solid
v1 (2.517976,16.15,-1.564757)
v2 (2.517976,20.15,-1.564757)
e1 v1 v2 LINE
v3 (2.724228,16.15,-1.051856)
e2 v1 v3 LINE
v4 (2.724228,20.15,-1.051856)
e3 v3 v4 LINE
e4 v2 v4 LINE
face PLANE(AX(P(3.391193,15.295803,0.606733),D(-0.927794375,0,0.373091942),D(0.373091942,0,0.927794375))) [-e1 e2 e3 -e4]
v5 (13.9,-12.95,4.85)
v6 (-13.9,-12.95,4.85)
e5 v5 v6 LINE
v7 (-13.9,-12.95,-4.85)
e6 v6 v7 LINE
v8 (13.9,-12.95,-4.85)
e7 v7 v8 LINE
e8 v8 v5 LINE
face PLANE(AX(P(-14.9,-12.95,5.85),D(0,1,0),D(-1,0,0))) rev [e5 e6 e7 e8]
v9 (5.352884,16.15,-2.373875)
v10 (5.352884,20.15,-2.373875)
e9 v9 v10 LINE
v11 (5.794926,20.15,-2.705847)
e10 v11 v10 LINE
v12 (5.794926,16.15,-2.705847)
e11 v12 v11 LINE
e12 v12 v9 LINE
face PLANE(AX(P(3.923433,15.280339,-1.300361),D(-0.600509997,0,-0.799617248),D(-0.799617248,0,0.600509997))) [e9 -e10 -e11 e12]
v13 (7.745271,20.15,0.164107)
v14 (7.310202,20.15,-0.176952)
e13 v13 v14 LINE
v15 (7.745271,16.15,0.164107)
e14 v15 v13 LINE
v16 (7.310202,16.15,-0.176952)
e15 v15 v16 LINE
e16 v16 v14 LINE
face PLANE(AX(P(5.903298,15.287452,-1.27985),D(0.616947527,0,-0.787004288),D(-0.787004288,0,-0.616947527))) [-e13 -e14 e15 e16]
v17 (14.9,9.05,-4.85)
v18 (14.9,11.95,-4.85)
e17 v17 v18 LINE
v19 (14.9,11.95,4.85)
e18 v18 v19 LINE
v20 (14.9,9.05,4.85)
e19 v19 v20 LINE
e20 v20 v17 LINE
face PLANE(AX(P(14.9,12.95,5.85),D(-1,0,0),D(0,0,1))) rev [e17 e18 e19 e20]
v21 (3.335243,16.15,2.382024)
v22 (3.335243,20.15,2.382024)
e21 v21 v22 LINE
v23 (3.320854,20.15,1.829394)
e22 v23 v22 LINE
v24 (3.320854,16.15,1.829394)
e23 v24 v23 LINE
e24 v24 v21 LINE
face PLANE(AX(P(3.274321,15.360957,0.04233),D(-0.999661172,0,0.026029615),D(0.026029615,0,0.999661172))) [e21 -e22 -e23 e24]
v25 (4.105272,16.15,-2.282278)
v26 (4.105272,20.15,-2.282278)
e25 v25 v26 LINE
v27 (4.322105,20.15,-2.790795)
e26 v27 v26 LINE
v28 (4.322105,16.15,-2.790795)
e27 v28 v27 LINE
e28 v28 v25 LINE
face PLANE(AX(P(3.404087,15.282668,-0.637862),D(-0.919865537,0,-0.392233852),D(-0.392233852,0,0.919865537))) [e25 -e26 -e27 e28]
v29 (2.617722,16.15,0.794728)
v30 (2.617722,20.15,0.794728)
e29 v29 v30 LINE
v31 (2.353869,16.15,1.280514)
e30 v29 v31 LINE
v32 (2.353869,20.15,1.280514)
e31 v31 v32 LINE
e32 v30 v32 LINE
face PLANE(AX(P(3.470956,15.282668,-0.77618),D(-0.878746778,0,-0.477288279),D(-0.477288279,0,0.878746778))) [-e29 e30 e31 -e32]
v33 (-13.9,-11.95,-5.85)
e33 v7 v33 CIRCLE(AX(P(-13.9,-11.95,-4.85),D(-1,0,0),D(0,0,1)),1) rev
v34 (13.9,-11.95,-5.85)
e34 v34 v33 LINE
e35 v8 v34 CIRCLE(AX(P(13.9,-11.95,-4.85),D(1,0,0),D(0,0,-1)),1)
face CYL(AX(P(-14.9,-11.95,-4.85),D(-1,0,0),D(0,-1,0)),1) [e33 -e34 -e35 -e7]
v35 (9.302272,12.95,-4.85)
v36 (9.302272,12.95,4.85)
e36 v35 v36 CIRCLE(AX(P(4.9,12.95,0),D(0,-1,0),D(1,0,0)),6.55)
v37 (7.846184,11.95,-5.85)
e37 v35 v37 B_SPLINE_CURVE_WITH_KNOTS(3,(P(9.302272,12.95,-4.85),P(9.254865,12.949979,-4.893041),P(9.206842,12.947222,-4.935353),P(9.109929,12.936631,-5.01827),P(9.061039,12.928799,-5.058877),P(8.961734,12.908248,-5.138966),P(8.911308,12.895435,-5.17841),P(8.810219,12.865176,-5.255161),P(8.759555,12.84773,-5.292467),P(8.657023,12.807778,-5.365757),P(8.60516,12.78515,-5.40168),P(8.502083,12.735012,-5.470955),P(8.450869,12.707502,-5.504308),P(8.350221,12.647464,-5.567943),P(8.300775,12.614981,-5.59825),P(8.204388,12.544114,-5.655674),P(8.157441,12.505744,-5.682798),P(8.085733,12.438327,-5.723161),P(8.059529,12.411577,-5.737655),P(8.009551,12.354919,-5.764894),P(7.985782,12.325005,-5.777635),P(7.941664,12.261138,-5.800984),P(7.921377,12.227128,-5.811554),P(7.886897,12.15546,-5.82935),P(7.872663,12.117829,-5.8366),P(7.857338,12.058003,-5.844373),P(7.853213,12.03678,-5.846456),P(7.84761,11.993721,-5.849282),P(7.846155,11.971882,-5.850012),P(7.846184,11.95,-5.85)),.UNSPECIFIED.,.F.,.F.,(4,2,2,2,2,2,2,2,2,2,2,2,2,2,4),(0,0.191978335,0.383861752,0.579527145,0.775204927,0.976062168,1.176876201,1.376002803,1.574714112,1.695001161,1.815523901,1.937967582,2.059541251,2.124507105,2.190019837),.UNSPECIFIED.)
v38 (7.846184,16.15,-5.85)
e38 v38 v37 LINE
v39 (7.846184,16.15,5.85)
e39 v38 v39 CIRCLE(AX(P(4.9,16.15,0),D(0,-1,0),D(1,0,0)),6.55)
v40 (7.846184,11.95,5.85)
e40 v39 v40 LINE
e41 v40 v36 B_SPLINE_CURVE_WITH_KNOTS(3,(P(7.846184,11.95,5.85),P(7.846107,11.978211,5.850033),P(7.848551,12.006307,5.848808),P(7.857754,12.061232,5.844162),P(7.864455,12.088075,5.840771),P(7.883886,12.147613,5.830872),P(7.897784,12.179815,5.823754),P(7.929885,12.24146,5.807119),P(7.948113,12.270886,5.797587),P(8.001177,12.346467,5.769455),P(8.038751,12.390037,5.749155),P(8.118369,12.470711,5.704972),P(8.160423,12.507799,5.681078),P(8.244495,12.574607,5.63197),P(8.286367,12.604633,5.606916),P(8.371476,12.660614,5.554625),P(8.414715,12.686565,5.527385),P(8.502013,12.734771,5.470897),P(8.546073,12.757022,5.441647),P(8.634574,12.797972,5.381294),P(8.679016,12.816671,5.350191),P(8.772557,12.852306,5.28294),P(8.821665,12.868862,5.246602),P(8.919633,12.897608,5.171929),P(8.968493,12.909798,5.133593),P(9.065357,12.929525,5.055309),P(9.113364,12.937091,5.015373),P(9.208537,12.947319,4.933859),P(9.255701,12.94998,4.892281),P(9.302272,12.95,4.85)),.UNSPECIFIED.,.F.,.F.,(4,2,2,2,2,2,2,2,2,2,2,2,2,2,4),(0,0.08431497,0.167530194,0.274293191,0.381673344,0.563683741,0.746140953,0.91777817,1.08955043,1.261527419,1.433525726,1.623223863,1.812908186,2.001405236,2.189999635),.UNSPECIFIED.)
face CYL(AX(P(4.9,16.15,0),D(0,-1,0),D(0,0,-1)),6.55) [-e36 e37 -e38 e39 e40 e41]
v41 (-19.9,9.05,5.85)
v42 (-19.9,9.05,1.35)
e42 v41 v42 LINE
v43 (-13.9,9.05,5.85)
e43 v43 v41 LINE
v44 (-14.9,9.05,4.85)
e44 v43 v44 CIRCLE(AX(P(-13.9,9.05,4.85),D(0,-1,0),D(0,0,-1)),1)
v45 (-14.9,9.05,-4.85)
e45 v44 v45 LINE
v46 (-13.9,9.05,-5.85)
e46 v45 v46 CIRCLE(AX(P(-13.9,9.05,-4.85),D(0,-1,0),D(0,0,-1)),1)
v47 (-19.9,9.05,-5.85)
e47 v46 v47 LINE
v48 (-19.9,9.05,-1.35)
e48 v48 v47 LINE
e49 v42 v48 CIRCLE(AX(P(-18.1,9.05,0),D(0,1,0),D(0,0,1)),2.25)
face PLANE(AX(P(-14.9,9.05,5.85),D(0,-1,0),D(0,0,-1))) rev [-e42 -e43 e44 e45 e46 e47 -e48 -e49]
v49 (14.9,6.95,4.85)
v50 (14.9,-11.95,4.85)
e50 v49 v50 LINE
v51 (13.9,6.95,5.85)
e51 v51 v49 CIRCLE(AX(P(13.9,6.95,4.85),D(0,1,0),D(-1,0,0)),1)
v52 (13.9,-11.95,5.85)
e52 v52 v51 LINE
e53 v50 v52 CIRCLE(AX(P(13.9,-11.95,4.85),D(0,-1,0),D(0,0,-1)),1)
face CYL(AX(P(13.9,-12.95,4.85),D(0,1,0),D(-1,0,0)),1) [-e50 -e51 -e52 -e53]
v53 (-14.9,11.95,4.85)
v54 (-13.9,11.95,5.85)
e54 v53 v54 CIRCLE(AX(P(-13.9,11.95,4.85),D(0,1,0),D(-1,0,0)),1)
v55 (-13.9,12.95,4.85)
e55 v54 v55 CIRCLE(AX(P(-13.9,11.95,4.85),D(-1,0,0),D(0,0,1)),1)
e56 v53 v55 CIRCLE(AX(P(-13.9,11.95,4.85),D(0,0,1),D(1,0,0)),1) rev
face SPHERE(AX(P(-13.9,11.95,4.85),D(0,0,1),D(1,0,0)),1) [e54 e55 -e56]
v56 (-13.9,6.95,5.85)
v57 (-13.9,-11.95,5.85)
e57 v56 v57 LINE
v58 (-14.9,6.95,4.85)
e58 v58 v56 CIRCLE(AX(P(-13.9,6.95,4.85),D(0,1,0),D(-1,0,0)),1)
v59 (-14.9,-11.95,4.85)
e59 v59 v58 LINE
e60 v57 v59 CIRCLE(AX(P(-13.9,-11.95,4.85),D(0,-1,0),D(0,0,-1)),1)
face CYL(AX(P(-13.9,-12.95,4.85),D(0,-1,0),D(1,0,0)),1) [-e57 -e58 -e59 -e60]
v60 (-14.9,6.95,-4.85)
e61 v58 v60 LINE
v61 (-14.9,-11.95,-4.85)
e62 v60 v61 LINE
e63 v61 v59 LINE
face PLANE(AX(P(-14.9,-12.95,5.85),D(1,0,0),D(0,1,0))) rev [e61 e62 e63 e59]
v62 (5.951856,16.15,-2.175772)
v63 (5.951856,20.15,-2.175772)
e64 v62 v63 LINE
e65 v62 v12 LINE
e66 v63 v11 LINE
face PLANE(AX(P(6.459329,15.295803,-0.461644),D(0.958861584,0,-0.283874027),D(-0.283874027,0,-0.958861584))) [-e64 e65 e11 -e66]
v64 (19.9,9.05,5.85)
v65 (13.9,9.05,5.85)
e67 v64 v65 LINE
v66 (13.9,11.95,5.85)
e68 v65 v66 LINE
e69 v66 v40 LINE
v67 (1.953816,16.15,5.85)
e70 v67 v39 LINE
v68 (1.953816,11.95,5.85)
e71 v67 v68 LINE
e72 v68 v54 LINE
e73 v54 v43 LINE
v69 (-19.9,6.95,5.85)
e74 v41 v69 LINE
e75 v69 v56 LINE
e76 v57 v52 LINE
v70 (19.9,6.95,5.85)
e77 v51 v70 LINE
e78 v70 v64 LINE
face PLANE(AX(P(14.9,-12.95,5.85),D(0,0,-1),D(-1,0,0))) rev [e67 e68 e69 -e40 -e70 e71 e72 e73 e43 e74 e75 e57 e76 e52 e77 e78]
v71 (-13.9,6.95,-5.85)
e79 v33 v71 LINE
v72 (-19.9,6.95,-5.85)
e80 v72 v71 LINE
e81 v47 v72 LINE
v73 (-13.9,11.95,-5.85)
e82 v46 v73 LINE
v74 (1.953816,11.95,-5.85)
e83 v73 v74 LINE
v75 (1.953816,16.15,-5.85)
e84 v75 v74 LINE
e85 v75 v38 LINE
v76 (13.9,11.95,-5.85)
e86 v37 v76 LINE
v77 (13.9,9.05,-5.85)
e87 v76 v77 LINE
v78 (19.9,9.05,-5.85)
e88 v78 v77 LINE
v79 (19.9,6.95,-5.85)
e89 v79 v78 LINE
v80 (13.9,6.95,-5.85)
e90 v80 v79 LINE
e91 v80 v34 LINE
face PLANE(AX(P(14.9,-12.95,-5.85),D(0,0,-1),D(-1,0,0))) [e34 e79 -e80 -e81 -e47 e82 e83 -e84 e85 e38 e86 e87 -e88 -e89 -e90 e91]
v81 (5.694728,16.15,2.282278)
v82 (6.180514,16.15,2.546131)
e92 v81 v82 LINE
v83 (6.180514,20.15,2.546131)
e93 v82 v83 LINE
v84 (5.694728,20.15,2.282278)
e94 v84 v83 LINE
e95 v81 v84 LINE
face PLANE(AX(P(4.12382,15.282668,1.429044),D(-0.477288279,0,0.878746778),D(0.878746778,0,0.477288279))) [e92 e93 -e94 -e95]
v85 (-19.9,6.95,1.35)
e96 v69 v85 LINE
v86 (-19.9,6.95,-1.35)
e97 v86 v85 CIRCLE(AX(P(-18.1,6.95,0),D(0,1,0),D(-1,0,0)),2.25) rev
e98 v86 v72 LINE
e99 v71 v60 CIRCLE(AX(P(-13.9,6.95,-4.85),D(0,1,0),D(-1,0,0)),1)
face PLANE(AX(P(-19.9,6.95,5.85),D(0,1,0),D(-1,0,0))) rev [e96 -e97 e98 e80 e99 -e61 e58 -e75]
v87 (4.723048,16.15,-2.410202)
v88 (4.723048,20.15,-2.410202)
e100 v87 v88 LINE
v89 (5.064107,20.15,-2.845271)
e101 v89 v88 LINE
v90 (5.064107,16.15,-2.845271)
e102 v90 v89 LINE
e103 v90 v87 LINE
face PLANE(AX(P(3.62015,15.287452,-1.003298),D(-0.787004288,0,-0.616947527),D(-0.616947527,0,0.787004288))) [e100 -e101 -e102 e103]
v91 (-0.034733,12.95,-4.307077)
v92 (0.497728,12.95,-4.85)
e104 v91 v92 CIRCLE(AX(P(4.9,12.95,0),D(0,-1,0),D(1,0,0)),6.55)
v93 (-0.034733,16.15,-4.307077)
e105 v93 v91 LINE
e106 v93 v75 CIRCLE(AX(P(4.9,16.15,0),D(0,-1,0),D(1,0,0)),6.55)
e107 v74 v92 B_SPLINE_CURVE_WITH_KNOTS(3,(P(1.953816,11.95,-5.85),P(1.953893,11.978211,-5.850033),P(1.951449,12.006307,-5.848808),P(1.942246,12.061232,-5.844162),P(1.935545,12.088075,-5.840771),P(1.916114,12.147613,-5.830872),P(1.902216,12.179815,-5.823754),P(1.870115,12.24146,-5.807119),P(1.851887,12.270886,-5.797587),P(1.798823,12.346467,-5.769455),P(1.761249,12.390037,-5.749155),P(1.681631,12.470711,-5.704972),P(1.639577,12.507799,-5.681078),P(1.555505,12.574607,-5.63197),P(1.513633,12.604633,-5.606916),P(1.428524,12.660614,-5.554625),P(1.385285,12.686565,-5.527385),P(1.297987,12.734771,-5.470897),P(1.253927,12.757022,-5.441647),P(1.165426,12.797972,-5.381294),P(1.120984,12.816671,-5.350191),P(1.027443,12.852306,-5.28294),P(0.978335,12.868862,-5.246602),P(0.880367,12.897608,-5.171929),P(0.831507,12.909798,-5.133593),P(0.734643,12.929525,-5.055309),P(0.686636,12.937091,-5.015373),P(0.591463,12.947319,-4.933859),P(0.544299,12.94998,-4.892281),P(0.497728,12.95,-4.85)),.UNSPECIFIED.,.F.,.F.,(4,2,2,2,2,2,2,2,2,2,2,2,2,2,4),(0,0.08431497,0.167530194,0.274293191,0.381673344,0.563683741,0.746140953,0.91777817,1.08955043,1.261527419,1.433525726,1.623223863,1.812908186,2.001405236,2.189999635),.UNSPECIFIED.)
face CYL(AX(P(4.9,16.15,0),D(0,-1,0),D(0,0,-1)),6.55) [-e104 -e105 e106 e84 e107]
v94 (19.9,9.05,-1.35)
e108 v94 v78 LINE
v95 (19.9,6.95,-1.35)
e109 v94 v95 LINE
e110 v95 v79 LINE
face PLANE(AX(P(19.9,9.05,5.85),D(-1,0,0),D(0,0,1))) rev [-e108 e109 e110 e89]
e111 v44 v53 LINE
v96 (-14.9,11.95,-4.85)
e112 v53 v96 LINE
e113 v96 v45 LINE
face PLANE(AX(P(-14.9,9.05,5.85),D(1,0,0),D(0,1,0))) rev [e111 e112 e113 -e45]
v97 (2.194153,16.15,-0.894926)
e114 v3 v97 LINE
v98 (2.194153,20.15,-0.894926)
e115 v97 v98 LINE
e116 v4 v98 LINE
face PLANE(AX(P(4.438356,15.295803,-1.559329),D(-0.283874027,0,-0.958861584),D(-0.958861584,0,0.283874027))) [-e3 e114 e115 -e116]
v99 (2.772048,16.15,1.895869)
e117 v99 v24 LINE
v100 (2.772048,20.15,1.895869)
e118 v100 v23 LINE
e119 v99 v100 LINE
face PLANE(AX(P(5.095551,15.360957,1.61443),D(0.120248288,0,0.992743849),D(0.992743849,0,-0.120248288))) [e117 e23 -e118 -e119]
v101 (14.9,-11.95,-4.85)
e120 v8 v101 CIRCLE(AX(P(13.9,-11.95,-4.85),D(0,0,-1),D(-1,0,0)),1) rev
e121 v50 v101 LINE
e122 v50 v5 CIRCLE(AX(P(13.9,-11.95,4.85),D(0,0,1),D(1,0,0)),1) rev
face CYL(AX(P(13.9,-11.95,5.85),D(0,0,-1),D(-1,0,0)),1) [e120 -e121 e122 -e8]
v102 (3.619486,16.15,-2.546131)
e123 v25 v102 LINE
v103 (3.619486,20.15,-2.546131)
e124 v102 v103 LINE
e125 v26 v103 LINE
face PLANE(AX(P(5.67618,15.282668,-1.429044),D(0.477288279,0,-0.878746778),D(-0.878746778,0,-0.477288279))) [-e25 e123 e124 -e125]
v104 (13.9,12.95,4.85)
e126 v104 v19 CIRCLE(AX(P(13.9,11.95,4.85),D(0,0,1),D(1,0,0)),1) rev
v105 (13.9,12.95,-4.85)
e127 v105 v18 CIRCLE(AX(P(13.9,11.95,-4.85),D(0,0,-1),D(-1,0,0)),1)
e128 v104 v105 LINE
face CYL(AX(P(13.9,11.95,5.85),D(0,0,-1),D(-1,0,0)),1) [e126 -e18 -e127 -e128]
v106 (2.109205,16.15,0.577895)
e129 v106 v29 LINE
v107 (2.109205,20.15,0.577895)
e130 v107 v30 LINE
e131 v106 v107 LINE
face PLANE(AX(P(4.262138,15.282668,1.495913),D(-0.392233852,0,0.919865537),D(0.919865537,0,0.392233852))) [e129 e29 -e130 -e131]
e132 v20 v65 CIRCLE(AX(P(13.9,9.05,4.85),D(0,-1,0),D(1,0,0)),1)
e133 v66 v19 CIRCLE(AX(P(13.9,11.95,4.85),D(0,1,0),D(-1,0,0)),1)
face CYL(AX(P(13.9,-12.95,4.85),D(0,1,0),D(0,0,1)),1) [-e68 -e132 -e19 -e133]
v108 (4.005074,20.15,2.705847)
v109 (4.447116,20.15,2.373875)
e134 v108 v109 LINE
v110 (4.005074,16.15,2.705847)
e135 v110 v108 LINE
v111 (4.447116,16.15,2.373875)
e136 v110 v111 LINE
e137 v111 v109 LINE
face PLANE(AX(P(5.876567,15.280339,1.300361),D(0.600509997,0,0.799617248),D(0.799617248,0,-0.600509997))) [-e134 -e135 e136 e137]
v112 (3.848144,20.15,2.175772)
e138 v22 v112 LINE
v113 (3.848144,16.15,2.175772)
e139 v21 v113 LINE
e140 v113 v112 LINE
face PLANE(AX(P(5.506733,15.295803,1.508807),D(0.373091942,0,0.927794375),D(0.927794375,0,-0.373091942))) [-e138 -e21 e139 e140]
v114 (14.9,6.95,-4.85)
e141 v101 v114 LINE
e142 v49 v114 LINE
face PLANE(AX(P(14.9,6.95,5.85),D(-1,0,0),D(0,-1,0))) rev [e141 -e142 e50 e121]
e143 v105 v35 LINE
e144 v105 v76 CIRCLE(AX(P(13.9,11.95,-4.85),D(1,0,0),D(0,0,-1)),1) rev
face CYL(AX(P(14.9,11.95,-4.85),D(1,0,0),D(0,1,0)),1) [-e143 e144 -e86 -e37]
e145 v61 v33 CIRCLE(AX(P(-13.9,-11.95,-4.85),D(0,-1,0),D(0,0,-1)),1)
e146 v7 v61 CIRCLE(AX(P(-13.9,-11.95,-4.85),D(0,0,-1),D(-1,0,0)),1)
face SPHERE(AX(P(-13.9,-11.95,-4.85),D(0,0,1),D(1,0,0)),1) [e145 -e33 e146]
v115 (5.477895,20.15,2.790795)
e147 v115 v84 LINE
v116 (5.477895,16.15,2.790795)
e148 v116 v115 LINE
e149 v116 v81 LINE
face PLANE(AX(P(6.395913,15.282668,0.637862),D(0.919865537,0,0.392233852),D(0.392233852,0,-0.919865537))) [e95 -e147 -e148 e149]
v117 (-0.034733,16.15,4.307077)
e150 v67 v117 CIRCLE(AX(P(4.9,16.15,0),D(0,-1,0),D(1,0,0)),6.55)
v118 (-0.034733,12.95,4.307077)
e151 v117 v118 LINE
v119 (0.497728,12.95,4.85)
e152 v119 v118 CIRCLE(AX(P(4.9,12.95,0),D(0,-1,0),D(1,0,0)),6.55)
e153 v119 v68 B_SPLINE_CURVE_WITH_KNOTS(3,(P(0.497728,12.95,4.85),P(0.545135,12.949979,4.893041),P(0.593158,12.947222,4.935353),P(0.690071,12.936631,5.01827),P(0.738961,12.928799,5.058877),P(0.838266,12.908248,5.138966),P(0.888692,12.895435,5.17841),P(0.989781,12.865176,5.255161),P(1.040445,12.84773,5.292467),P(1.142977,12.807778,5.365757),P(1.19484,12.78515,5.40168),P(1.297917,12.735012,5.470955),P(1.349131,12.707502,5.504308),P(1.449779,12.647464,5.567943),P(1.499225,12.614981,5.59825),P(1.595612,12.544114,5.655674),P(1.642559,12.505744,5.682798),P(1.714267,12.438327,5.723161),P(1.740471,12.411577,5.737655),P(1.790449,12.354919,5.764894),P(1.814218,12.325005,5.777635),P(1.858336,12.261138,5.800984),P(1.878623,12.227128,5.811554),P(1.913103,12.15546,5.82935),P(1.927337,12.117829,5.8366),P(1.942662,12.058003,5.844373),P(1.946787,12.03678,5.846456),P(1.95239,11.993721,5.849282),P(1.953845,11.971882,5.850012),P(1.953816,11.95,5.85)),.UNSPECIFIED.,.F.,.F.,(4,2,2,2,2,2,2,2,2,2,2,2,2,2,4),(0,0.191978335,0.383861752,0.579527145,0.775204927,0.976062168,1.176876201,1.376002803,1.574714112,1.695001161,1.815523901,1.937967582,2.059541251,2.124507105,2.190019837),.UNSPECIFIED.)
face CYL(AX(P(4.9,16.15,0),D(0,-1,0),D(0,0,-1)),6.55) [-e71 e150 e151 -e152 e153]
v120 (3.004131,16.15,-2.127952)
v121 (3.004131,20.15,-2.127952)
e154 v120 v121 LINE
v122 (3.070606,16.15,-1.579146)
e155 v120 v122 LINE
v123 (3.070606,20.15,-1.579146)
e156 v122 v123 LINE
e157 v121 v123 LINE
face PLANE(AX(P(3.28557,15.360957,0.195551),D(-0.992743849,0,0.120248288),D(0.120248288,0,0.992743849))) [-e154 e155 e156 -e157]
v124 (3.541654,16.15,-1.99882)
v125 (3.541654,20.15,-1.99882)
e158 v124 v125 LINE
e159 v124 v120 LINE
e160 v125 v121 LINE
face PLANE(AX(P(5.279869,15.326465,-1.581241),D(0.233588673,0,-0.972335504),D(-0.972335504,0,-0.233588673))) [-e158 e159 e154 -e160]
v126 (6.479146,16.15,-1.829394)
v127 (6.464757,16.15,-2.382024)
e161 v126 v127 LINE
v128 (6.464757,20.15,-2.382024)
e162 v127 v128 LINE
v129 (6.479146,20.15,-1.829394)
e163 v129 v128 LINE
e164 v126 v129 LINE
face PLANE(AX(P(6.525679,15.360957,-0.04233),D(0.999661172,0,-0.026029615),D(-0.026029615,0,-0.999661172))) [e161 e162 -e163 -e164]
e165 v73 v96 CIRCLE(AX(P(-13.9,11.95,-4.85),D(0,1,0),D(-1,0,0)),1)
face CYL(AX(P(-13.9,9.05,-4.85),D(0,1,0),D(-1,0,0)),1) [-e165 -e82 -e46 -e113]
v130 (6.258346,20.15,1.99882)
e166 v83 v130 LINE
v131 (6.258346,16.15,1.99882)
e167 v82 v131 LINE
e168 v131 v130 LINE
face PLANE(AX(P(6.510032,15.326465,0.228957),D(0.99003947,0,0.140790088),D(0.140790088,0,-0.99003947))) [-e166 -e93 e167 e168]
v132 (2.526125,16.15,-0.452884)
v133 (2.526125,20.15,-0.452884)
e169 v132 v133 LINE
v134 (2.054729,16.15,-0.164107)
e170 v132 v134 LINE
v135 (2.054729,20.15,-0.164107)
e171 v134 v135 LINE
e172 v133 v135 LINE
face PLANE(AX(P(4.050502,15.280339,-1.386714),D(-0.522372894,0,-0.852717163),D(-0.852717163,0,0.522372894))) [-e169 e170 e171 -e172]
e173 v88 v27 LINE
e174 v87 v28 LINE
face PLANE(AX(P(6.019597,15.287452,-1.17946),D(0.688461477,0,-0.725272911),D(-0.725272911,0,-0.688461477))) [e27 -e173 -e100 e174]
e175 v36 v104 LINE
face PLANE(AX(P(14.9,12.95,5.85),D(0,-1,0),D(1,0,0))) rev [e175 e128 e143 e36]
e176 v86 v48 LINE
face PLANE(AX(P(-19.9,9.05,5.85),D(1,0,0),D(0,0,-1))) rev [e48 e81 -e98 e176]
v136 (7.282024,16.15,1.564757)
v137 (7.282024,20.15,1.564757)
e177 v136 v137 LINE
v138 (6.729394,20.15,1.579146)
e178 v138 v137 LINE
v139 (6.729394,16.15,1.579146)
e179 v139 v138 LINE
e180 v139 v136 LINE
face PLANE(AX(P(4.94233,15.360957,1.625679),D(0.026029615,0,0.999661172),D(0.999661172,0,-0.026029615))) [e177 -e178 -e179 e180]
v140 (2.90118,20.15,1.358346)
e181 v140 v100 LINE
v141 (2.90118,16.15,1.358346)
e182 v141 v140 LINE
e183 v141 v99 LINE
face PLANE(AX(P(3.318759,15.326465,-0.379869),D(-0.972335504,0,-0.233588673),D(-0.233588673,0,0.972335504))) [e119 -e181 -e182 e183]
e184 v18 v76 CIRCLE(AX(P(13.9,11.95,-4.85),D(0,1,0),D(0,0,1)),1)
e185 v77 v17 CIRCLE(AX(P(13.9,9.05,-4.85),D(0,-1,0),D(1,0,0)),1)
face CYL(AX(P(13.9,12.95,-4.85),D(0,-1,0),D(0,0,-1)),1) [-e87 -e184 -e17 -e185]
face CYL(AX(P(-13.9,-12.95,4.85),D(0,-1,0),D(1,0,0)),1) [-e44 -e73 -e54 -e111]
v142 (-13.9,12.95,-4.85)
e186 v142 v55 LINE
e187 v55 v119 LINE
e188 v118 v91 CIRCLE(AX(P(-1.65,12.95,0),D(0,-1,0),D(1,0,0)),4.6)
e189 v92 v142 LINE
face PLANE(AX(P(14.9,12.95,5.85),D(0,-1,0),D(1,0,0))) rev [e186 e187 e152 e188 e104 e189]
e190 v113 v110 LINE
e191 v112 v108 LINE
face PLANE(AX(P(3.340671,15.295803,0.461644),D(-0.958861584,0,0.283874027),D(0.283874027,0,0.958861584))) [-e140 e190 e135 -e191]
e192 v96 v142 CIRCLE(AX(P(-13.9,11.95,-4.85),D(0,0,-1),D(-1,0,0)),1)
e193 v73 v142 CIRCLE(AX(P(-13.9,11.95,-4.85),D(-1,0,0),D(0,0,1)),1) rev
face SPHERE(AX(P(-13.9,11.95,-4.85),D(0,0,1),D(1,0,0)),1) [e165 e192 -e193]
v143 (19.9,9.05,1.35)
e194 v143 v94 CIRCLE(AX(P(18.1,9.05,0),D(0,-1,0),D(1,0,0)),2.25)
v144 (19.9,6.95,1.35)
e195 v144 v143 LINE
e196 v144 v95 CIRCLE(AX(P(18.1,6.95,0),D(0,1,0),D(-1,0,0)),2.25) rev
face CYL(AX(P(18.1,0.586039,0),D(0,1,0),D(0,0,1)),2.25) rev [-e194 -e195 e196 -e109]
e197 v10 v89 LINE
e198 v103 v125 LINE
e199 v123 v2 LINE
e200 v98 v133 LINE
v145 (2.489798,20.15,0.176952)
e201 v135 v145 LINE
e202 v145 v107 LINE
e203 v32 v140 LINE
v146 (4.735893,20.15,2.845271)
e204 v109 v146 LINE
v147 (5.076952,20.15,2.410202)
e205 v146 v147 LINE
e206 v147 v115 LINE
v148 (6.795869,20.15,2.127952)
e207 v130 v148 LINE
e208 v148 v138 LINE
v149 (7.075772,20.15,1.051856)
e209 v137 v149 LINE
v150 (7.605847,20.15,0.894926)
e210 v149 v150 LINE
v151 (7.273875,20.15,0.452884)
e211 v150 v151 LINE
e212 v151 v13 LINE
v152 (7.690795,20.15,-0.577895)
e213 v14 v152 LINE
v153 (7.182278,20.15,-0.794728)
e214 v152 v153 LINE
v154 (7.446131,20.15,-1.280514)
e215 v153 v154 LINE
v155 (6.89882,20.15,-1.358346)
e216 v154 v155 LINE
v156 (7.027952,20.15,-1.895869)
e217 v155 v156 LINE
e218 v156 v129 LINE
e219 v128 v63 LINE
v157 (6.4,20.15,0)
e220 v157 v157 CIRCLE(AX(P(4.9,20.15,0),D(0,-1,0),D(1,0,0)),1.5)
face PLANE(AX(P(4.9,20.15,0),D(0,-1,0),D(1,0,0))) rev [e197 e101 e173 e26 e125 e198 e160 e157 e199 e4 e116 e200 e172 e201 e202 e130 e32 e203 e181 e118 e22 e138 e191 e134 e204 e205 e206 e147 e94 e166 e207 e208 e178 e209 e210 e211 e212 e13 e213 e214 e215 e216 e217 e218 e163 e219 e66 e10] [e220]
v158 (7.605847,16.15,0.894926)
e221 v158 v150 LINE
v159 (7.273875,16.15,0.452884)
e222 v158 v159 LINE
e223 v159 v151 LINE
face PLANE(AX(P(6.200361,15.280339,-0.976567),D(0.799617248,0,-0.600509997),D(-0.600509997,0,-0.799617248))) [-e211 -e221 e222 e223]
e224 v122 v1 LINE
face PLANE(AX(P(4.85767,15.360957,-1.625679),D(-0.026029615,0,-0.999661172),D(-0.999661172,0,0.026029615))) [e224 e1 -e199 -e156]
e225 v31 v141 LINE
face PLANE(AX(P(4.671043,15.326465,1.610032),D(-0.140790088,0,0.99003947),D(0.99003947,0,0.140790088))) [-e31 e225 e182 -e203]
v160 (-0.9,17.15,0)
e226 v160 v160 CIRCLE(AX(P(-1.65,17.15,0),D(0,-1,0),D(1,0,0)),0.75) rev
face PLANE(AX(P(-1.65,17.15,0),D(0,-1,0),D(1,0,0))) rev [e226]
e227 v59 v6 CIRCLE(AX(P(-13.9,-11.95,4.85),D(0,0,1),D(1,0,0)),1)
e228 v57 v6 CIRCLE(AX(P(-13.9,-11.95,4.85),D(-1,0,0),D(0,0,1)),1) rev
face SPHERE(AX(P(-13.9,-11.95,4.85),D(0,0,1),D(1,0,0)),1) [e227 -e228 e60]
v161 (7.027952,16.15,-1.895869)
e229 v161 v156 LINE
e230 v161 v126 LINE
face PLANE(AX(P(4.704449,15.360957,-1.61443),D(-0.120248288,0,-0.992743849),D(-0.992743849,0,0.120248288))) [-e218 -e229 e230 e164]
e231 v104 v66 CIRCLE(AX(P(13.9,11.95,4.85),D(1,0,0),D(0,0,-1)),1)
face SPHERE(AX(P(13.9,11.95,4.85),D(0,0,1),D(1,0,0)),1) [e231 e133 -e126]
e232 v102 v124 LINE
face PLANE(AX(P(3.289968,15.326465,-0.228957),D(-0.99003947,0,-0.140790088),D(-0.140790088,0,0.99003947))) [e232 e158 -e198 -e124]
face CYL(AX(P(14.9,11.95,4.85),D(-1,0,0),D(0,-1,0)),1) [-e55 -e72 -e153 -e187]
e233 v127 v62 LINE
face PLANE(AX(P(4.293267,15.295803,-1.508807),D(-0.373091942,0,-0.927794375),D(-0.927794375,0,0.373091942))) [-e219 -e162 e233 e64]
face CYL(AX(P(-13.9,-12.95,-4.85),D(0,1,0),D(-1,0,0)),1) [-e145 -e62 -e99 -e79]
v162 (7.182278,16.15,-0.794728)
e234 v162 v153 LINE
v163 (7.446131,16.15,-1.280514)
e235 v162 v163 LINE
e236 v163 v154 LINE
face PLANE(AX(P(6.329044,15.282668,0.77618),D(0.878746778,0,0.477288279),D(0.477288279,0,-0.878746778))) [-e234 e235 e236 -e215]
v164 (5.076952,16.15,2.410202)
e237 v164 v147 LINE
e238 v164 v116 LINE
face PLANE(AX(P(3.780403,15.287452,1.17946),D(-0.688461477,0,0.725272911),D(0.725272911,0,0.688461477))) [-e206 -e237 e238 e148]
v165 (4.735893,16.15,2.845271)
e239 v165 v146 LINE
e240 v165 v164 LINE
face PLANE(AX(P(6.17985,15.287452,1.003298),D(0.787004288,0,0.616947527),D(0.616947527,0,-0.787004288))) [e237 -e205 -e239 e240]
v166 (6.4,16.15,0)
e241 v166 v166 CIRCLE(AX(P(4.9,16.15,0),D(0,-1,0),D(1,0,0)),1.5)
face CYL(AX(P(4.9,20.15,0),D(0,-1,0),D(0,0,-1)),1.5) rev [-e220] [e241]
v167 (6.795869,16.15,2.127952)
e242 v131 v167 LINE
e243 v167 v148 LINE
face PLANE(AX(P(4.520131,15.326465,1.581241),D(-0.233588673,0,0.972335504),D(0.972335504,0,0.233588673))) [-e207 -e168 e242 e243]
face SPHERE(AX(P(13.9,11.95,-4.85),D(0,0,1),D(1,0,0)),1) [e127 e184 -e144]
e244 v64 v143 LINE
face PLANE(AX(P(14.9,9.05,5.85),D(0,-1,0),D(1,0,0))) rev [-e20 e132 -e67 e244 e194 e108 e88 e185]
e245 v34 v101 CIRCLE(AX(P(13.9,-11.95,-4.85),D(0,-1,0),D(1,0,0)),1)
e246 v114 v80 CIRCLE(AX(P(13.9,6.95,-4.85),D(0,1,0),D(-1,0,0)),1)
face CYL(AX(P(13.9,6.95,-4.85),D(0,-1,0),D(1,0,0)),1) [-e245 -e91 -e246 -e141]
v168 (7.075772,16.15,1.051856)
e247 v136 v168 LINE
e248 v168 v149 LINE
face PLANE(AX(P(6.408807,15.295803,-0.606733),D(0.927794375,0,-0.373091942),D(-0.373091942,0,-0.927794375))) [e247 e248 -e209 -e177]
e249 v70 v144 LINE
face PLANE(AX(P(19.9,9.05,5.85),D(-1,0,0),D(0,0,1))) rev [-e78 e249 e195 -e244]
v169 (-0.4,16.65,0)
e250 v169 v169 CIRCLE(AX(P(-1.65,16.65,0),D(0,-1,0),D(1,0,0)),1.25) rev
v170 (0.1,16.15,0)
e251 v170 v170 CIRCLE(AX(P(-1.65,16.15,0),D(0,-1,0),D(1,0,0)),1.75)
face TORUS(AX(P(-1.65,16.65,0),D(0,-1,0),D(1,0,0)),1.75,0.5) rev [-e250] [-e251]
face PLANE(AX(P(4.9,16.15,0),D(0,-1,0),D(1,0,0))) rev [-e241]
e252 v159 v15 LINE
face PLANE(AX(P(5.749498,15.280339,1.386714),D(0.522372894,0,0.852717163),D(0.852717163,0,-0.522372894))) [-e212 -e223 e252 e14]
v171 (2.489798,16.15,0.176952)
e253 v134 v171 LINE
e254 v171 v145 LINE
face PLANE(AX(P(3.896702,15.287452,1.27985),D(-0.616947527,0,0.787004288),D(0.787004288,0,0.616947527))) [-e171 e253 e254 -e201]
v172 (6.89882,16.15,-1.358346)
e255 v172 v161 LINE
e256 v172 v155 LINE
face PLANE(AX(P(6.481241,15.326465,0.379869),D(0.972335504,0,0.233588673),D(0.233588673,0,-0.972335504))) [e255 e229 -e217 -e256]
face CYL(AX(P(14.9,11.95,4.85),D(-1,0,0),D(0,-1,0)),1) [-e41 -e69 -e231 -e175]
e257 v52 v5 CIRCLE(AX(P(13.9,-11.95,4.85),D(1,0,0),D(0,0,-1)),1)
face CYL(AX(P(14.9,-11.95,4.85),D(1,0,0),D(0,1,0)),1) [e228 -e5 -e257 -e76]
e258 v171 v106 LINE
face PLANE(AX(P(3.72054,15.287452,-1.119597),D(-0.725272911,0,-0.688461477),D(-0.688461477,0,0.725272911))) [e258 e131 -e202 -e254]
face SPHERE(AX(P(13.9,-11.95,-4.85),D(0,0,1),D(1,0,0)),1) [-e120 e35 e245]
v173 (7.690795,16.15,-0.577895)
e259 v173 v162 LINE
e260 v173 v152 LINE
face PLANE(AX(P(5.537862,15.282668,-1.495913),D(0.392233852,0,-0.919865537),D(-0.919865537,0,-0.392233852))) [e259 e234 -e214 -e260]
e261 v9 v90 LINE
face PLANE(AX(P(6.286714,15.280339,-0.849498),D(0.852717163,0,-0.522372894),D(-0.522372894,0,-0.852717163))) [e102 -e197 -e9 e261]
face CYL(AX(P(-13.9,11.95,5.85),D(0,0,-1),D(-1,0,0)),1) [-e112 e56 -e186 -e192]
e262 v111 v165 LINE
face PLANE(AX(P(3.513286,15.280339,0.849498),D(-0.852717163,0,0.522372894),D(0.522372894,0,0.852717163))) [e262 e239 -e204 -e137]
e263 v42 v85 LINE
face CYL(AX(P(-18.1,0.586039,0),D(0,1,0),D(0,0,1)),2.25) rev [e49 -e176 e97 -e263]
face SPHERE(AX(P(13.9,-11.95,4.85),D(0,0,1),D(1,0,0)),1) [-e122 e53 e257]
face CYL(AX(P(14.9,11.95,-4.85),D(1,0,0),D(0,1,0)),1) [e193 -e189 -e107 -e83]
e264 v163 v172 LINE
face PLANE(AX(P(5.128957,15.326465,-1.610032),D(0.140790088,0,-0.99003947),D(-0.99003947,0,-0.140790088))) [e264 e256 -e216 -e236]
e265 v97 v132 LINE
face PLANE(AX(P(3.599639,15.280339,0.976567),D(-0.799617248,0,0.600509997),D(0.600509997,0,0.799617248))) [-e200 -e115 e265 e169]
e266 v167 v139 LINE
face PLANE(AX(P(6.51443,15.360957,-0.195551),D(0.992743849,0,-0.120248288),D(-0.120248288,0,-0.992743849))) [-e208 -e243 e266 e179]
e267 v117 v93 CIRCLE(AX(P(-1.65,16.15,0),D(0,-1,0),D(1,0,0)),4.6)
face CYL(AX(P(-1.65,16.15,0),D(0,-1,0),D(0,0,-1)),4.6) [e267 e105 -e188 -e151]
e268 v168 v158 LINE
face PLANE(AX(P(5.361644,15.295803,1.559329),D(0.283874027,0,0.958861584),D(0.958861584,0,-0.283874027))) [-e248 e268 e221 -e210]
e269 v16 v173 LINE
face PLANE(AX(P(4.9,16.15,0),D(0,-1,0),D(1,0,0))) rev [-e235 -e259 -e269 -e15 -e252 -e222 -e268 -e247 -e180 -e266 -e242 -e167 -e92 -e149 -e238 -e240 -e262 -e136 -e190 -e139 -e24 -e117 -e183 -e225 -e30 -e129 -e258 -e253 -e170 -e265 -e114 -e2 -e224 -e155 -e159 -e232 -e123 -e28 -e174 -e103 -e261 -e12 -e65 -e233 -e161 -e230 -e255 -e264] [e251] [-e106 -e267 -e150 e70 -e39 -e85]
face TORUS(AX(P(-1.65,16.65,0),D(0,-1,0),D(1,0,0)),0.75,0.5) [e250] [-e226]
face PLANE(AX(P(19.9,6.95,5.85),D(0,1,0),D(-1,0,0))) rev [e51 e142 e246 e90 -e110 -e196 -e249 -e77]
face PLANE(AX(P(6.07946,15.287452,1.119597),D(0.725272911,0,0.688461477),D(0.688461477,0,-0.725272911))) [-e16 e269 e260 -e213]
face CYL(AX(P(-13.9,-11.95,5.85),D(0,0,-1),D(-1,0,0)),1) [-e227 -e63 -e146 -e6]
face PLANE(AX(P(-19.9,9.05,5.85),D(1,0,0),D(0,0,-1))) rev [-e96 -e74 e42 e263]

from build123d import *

# Parameters (mm, degrees)
EXTRUDE1_DEPTH    = 5.85
EXTRUDE2_START    = 9.05
SKETCH2_R         = 2.25
EXTRUDE2_DEPTH    = 2.1
EXTRUDE3_START    = 12.95
EXTRUDE3_DEPTH    = 3.2
EXTRUDE6_START    = 16.15
SKETCH6_R         = 1.25
EXTRUDE6_DEPTH    = 1
EXTRUDE4_START    = 16.15
SKETCH4_R         = 2.85
SKETCH4_R_2       = 1.5
EXTRUDE4_DEPTH    = 4
EXTRUDE5_START    = 16.15
EXTRUDE5_DEPTH    = 4
CIRPATTERN1_COUNT = 24
FILLET1_R         = 1
FILLET2_R         = 0.5


with BuildPart() as part:
    # Sketch1 → Extrude1 (new, symmetric)
    with BuildSketch(Plane.XY):
        Polygon((-14.9, -12.95), (-14.9, 6.95), (-19.9, 6.95), (-19.9, 9.05), (-14.9, 9.05), (-14.9, 12.95), (14.9, 12.95), (14.9, 9.05), (19.9, 9.05), (19.9, 6.95), (14.9, 6.95), (14.9, -12.95), align=None)
    extrude(amount=EXTRUDE1_DEPTH, both=True)

    # Sketch2 → Extrude2 (cut)
    with BuildSketch(Plane(origin=(0, 0, 0), x_dir=(1, 0, 0), z_dir=(0, 1, 0)).offset(EXTRUDE2_START)):
        with Locations((-18.1, 0)):
            Circle(SKETCH2_R)
        with Locations((18.1, 0)):
            Circle(SKETCH2_R)
    extrude(amount=-EXTRUDE2_DEPTH, mode=Mode.SUBTRACT)

    # Sketch3 → Extrude3 (add)
    with BuildSketch(Plane(origin=(0, 0, 0), x_dir=(1, 0, 0), z_dir=(0, 1, 0)).offset(EXTRUDE3_START)):
        with BuildLine():
            Line((7.846183973, 5.85), (1.953816027, 5.85))
            ThreePointArc((1.953816027, 5.85), (0.884733475, 5.174952631), (-0.034732824, 4.307076961))
            ThreePointArc((-0.034732824, 4.307076961), (-6.25, 0), (-0.034732824, -4.307076961))
            ThreePointArc((-0.034732824, -4.307076961), (0.884733475, -5.174952631), (1.953816027, -5.85))
            Line((1.953816027, -5.85), (7.846183973, -5.85))
            ThreePointArc((7.846183973, -5.85), (11.45, 0), (7.846183973, 5.85))
        make_face()
    extrude(amount=EXTRUDE3_DEPTH)

    # Sketch6 → Extrude6 (add)
    with BuildSketch(Plane(origin=(0, 0, 0), x_dir=(1, 0, 0), z_dir=(0, 1, 0)).offset(EXTRUDE6_START)):
        with Locations((-1.65, 0)):
            Circle(SKETCH6_R)
    extrude(amount=EXTRUDE6_DEPTH)

    # Sketch4 → Extrude4 (add)
    with BuildSketch(Plane(origin=(0, 0, 0), x_dir=(1, 0, 0), z_dir=(0, 1, 0)).offset(EXTRUDE4_START)):
        with Locations((4.9, 0)):
            Circle(SKETCH4_R)
        with Locations((4.9, 0)):
            Circle(SKETCH4_R_2, mode=Mode.SUBTRACT)
    extrude(amount=EXTRUDE4_DEPTH)

    # Sketch5 → Extrude5 (cut)
    with BuildSketch(Plane(origin=(0, 0, 0), x_dir=(1, 0, 0), z_dir=(0, 1, 0)).offset(EXTRUDE5_START)):
        with BuildLine():
            Line((4.005073985, -2.705846897), (4.447115963, -2.373874784))
            Line((4.447115963, -2.373874784), (4.735892559, -2.845271296))
            ThreePointArc((4.735892559, -2.845271296), (4.365914093, -2.799509286), (4.005073985, -2.705846897))
        make_face()
    extrude5 = extrude(amount=EXTRUDE5_DEPTH, mode=Mode.SUBTRACT)

    # CirPattern1: Extrude5 ×24 about axis
    cirpattern1_axis = Axis((4.9, 0, 0), (0, 1, 0))
    for i in range(1, CIRPATTERN1_COUNT):
        add(extrude5.rotate(cirpattern1_axis, i * 360 / CIRPATTERN1_COUNT), mode=Mode.SUBTRACT)

    # Fillet1
    fillet1_edges = [part.edges().sort_by_distance(p)[0] for p in [
        (11.373091986, 12.95, -5.85),
        (14.9, 12.95, 0),
        (11.373091986, 12.95, 5.85),
        (-6.473091986, 12.95, -5.85),
        (-14.9, 12.95, 0),
        (-6.473091986, 12.95, 5.85),
        (14.9, -12.95, 0),
        (-14.9, -12.95, 0),
        (0, -12.95, 5.85),
        (0, -12.95, -5.85),
        (14.9, 11, -5.85),
        (-14.9, 11, -5.85),
        (-14.9, 11, 5.85),
        (14.9, 11, 5.85),
        (14.9, -3, 5.85),
        (14.9, -3, -5.85),
        (-14.9, -3, -5.85),
        (-14.9, -3, 5.85),
    ]]
    fillet(fillet1_edges, radius=FILLET1_R)

    # Fillet2
    fillet2_edges = [part.edges().sort_by_distance(p)[0] for p in [
        (-2.9, 17.15, 0),
        (-2.9, 16.15, 0),
    ]]
    fillet(fillet2_edges, radius=FILLET2_R - 0.0001)  # a hair under: the kernel refuses the full size


solid = part.part
